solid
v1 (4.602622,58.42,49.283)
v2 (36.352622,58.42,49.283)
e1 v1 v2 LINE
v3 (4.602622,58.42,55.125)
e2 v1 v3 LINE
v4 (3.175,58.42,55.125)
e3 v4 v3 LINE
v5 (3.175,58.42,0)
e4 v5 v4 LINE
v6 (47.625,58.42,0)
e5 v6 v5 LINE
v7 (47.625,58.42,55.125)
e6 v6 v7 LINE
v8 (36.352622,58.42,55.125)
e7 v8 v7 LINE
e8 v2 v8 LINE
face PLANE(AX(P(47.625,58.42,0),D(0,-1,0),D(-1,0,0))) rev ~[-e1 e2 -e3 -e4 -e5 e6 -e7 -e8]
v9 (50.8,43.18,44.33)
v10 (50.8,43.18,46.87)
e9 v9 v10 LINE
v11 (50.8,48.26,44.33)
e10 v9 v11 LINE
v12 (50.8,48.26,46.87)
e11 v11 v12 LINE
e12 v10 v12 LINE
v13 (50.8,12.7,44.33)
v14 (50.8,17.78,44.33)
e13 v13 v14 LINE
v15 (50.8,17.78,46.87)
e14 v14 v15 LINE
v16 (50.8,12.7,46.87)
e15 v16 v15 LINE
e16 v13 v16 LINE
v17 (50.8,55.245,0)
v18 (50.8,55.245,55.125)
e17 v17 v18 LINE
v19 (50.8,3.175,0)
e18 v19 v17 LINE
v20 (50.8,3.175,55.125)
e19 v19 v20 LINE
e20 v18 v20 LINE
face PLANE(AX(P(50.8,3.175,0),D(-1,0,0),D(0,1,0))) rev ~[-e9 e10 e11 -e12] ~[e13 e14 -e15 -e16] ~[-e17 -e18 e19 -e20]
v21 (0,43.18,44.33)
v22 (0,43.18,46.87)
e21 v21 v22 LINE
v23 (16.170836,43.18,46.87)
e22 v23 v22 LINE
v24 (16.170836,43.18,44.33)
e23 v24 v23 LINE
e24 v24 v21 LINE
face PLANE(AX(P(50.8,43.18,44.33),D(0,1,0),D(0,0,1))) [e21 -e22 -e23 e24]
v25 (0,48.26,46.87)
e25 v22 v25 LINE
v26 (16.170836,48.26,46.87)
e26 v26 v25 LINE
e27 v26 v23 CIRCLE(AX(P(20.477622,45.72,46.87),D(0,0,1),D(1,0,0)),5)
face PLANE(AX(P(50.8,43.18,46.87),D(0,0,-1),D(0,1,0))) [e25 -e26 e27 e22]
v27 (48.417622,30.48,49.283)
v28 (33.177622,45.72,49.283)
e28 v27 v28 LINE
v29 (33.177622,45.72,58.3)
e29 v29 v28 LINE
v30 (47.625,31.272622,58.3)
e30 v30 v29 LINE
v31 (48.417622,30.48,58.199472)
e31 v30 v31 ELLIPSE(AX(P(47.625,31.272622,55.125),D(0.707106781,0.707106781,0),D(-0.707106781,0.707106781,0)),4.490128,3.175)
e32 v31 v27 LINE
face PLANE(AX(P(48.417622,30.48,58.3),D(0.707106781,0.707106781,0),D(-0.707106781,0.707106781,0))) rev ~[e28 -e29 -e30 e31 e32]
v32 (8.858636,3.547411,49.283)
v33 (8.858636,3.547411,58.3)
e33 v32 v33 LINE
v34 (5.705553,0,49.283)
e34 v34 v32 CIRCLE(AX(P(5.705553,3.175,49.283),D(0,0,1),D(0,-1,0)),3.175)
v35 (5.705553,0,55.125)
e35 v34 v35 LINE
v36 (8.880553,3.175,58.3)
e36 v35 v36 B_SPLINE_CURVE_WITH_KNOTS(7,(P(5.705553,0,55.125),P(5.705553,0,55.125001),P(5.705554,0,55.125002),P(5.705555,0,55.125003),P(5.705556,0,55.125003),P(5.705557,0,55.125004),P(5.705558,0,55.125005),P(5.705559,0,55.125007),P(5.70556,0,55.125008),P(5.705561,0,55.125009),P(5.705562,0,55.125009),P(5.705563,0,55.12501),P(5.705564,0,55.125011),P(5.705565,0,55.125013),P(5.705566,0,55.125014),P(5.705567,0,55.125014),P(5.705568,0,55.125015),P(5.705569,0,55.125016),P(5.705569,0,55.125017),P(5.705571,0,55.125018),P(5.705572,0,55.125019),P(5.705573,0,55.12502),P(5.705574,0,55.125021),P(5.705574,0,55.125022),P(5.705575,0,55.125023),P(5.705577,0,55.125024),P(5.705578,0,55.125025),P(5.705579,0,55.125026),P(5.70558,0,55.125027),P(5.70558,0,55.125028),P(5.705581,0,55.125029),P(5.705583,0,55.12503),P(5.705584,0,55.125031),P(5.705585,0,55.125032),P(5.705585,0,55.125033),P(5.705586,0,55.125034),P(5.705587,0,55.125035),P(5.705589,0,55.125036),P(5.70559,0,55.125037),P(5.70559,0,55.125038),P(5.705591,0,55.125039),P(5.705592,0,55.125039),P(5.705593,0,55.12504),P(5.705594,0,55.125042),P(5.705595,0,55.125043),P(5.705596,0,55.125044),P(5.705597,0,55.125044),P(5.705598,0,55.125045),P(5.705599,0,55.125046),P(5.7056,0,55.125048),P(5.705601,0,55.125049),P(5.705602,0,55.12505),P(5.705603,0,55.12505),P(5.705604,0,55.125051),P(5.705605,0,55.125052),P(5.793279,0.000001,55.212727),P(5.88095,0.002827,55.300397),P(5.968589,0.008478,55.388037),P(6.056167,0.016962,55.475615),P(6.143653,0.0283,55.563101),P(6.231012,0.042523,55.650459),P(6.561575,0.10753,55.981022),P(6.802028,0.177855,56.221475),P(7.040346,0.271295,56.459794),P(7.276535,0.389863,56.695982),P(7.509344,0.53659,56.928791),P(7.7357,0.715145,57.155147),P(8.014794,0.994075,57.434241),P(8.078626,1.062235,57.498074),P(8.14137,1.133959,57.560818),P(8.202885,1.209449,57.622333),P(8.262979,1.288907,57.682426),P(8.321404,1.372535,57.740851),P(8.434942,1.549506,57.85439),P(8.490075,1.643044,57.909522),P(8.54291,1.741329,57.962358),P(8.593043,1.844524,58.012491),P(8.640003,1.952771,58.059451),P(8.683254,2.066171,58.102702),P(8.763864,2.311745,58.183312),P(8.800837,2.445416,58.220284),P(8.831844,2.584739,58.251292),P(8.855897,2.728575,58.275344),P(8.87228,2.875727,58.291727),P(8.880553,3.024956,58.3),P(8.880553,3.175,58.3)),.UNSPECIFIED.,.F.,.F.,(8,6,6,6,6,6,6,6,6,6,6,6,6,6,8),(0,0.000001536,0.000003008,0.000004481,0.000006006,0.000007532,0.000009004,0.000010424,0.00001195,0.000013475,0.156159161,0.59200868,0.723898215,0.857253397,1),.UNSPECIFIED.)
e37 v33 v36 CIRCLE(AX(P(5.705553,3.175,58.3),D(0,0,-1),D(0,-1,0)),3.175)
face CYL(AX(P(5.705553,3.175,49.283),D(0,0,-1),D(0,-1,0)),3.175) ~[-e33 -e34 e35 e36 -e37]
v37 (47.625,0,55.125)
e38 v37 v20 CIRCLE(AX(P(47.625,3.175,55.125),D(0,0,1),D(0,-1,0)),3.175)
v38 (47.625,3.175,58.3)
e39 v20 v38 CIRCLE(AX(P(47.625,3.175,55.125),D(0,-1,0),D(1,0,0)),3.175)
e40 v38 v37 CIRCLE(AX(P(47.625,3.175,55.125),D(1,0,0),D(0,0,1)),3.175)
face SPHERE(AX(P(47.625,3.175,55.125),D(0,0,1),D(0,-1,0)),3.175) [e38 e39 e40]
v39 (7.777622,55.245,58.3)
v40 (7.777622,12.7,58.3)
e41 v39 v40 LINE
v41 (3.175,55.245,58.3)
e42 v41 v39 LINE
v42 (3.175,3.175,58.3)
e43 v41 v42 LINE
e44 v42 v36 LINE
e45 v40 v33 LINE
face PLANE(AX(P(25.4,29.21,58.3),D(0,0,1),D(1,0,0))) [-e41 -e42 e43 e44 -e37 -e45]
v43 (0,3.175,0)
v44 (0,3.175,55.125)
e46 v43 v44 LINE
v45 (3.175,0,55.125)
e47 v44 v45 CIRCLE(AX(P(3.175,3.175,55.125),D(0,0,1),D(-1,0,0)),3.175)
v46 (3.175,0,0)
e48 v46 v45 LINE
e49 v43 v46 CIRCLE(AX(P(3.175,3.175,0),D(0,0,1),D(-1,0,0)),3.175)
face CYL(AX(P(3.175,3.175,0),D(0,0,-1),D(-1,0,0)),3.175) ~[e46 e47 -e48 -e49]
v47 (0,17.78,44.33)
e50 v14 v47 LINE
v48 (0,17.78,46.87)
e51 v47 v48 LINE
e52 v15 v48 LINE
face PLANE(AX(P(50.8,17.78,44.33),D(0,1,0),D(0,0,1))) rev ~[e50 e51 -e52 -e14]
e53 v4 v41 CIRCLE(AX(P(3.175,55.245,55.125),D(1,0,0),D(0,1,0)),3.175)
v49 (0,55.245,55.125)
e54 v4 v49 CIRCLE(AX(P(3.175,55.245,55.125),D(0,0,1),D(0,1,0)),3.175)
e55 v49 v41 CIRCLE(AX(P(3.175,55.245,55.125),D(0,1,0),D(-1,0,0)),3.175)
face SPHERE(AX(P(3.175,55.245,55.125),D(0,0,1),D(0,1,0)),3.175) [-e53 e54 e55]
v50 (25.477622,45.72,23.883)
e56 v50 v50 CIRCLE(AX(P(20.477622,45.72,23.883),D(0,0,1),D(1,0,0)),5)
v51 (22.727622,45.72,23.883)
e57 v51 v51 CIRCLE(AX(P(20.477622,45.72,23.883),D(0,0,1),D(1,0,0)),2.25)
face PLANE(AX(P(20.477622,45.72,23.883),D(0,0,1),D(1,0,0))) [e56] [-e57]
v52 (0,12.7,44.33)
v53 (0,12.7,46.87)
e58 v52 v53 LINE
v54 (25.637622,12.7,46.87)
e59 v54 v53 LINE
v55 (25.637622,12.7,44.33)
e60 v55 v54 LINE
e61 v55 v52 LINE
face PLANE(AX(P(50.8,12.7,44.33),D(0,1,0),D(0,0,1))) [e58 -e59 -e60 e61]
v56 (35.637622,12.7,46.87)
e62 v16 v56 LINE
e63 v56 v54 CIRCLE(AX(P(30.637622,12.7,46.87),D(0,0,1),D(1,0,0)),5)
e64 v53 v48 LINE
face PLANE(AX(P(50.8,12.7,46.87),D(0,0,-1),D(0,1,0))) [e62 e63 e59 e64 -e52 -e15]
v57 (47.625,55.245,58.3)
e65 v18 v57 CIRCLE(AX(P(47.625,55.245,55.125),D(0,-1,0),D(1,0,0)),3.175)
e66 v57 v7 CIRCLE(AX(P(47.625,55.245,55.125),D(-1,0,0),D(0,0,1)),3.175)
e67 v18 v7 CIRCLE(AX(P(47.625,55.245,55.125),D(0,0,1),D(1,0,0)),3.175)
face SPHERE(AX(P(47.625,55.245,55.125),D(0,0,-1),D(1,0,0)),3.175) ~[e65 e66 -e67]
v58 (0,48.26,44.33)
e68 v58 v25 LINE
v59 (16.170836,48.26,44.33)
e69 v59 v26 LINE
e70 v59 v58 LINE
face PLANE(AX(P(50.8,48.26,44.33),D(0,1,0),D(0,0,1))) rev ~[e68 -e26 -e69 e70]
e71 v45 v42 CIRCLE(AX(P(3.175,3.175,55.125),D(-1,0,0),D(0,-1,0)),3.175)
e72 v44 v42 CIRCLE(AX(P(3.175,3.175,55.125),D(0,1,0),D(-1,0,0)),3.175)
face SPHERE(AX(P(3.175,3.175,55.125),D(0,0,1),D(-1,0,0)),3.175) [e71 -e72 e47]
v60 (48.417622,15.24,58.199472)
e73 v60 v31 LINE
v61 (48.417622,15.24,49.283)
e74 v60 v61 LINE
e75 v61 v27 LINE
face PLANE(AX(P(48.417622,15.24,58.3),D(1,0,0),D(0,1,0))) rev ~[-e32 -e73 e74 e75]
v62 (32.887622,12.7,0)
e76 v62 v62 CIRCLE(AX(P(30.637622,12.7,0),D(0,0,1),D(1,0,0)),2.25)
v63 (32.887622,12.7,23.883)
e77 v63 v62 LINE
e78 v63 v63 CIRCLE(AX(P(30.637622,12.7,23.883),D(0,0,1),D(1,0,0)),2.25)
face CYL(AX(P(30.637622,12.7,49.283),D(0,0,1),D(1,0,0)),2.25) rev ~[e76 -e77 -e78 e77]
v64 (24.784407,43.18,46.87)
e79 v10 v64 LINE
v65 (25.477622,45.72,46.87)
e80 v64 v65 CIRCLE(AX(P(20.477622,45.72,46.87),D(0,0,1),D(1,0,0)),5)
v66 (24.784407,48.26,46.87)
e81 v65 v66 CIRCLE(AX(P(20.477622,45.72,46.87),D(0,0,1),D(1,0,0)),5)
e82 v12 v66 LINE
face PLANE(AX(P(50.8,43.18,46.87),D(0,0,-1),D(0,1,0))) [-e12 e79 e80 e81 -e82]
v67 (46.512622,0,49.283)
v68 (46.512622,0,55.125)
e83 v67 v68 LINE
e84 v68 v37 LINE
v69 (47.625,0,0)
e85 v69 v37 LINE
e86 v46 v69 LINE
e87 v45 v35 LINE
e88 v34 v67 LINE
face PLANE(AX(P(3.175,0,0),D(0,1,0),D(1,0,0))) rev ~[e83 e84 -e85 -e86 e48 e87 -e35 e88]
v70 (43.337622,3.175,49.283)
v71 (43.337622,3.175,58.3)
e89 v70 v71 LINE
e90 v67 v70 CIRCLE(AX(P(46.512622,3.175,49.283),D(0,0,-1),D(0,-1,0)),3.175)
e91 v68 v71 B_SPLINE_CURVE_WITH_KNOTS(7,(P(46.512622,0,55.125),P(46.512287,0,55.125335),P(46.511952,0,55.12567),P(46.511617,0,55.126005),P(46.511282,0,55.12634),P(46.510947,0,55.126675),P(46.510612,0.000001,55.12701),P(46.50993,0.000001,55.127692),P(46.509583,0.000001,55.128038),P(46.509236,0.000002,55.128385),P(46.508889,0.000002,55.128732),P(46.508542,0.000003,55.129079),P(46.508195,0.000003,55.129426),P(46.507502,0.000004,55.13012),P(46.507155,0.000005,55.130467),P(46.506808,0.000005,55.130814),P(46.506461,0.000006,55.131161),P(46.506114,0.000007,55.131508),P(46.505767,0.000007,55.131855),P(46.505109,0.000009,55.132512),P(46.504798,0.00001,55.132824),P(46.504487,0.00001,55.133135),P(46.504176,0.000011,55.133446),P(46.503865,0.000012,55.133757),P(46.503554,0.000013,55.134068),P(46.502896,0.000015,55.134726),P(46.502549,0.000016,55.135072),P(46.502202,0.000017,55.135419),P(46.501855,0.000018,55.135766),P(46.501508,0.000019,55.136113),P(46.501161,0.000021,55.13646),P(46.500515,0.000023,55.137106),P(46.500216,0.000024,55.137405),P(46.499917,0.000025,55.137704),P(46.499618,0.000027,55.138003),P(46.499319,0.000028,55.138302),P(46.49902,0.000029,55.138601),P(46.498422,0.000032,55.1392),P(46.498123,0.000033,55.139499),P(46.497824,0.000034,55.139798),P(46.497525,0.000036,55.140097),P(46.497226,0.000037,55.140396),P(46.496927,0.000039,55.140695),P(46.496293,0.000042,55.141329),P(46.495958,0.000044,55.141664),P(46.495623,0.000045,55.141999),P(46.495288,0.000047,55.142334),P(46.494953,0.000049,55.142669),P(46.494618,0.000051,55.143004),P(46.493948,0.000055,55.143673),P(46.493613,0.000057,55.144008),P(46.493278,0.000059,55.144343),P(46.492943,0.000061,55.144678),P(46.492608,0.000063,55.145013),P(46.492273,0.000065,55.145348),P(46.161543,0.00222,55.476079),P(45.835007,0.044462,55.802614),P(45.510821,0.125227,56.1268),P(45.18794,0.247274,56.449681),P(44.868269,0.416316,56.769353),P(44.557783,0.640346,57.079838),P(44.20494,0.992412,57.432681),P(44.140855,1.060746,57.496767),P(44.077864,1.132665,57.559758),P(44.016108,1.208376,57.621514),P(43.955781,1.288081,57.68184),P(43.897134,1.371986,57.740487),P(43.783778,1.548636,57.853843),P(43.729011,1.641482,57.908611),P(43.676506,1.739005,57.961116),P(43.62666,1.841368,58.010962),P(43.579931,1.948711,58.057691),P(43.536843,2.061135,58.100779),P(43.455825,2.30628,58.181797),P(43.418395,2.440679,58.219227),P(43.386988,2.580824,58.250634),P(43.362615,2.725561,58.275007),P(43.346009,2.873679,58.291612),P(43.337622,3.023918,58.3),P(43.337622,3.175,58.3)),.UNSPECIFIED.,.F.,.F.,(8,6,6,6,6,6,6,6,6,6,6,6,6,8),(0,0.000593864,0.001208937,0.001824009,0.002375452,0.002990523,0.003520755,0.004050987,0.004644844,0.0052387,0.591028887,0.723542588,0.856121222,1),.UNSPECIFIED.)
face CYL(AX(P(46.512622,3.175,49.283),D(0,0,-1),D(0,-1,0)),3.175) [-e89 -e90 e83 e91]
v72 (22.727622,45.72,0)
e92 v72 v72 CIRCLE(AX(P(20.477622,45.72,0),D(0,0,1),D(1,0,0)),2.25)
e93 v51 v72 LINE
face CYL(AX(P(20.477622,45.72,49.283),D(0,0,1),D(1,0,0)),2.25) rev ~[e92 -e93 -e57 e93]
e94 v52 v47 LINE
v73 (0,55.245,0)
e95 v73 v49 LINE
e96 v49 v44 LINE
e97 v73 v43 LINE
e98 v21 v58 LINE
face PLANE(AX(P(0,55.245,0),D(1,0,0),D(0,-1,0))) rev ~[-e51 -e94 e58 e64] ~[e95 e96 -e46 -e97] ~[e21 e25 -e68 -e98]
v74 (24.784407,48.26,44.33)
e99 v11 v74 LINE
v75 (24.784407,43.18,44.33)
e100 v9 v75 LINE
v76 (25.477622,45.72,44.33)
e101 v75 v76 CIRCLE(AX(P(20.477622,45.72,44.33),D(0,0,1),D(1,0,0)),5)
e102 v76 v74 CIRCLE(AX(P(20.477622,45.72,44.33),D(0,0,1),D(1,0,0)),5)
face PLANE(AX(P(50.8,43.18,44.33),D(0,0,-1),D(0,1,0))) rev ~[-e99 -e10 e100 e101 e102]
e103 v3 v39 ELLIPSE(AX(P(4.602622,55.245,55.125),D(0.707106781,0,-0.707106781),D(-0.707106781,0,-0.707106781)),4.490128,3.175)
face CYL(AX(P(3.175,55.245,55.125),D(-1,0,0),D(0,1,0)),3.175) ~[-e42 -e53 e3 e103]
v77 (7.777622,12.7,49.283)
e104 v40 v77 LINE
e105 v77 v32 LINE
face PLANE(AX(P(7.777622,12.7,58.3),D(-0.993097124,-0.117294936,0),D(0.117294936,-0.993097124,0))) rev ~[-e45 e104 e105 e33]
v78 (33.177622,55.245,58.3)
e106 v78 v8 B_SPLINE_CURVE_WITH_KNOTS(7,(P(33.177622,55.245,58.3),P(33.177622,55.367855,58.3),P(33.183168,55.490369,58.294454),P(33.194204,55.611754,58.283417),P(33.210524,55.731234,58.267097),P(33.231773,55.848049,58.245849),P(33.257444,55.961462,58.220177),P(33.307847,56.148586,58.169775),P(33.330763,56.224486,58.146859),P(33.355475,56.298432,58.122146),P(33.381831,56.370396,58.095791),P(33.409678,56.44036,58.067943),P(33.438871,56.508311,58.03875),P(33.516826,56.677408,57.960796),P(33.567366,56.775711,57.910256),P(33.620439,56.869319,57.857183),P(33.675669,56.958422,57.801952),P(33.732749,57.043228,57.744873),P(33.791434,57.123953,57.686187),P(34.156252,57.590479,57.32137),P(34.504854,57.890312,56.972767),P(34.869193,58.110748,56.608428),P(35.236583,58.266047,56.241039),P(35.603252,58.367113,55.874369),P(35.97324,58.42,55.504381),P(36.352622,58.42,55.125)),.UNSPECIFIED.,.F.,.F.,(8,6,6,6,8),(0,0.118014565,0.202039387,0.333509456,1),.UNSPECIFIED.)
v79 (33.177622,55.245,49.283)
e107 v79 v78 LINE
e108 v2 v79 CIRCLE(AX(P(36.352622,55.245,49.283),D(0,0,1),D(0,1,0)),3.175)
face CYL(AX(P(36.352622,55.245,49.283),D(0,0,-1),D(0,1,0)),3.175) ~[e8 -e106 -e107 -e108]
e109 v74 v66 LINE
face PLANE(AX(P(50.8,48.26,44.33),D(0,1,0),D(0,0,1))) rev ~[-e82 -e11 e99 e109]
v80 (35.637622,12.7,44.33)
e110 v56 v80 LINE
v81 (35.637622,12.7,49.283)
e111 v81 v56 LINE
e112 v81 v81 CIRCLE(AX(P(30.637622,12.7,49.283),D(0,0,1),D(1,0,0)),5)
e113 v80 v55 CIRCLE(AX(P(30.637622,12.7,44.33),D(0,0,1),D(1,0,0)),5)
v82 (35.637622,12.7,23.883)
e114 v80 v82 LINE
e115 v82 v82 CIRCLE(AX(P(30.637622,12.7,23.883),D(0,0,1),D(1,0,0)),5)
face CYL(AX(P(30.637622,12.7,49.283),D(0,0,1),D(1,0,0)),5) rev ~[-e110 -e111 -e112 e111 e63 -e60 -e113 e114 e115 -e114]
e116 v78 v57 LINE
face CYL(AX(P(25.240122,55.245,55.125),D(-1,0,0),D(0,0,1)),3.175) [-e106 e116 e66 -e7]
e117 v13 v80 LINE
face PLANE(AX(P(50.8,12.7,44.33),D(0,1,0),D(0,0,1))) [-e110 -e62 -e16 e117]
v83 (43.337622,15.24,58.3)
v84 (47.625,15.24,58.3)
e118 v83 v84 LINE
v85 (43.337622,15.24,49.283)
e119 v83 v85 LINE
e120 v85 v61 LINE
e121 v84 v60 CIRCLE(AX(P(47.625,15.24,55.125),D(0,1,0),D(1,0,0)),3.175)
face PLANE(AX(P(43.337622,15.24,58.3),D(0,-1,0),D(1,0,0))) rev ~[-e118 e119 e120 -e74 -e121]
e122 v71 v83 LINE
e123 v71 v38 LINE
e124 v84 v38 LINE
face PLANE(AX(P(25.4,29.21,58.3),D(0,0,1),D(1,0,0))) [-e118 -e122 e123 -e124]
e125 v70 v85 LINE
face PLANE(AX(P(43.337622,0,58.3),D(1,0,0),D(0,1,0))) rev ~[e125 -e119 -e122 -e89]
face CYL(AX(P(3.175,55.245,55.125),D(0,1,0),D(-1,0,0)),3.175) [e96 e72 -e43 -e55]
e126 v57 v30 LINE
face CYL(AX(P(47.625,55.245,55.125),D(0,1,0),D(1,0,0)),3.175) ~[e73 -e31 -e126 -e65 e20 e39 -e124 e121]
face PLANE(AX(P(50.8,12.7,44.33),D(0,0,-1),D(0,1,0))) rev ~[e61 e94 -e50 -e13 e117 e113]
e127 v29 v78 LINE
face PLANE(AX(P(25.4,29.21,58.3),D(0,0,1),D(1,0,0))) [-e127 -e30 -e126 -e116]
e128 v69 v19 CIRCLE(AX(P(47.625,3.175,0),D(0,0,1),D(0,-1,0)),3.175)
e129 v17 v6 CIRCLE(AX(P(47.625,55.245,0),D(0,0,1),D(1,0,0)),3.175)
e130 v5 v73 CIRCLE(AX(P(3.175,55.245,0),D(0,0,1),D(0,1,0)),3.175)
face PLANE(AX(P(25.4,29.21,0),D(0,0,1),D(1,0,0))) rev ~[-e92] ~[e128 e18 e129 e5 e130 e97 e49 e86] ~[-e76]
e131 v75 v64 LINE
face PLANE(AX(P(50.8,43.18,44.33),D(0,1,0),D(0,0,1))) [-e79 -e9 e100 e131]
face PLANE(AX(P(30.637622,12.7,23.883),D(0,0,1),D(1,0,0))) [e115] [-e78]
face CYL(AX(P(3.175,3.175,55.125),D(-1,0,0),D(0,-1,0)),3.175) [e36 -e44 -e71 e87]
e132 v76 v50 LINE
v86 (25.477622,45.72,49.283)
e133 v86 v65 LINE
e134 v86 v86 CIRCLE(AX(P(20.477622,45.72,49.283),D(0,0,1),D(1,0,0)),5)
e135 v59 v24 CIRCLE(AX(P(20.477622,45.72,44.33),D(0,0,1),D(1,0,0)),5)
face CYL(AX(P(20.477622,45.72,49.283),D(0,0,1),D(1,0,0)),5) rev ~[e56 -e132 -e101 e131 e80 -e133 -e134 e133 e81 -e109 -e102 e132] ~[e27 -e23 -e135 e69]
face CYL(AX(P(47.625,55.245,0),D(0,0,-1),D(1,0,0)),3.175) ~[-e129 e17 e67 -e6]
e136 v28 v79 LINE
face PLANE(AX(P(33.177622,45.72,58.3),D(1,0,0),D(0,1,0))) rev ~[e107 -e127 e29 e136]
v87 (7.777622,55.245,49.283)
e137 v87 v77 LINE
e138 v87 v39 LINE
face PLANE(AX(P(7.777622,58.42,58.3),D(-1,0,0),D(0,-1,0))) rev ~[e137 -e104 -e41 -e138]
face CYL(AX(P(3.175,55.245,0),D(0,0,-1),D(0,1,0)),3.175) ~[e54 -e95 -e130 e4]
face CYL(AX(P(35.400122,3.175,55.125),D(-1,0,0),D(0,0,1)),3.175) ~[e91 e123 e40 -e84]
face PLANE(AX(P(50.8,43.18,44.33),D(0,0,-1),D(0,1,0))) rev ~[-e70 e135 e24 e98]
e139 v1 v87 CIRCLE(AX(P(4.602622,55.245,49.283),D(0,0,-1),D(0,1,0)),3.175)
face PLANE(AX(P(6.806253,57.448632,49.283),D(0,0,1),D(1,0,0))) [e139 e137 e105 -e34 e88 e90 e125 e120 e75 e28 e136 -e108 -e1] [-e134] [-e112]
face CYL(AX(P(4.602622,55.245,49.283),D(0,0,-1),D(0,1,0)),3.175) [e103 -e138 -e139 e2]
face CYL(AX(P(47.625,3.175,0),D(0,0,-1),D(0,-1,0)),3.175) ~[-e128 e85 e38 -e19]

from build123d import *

# Parameters (mm, degrees)
F1_DEPTH     = 58.3
F3_DEPTH     = 9.017
F4_W         = 5.08
F4_H         = 2.54
F5_DEPTH     = 50.801
F6_T1_DEPTH  = 17.9471724254
F6_T3_DEPTH  = 16.9545
F6_T5_DEPTH  = 52.07
F6_T7_DEPTH  = 22.3848784961
F6_T9_DEPTH  = 12.2248784961
F6_T11_DEPTH = 14.0401215039
F6_T13_DEPTH = 12.5401215039
F6_T16_ANGLE = 90
F6_T18_ANGLE = 90
F6_T20_ANGLE = 90
F6_T22_ANGLE = 90
F7_R         = 5
F8_DEPTH     = 25.4
F9_R         = 2.25
F10_DEPTH    = 49.284


# Not quite as in the source:
# - a fillet or chamfer that OpenCascade refuses, or shapes differently, is made with other operations: its cross-section is extruded or revolved along the edge and cut away or added


with BuildPart() as f1:
    # F0 (on Top) → F1 (new body)
    with BuildSketch(Plane.XY):
        with BuildLine():
            Line((47.625, 58.42), (3.175, 58.42))
            ThreePointArc((3.175, 58.42), (0.9299359697, 57.4900640303), (0, 55.245))
            Line((0, 55.245), (0, 3.175))
            ThreePointArc((0, 3.175), (0.9299359697, 0.9299359697), (3.175, 0))
            Line((3.175, 0), (47.625, 0))
            ThreePointArc((47.625, 0), (49.8700640303, 0.9299359697), (50.8, 3.175))
            Line((50.8, 3.175), (50.8, 55.245))
            ThreePointArc((50.8, 55.245), (49.8700640303, 57.4900640303), (47.625, 58.42))
        make_face()
    extrude(amount=F1_DEPTH)

    # F2 (on face) → F3 (cut)
    with BuildSketch(Plane.XY.offset(58.3)):
        Polygon((33.1776215039, 45.72), (33.1776215039, 58.42), (7.7776215039, 58.42), (7.7776215039, 12.7), (9.2776215039, 0), (43.3376215039, 0), (43.3376215039, 15.24), (48.4176215039, 15.24), (48.4176215039, 30.48), align=None)
    extrude(amount=-F3_DEPTH, mode=Mode.SUBTRACT)

    # F4 (on face) → F5 (cut, through all)
    with BuildSketch(Plane.YZ.offset(50.8)):
        with Locations((15.24, 45.6)):
            Rectangle(F4_W, F4_H)
        with Locations((45.72, 45.6)):
            Rectangle(F4_W, F4_H)
    extrude(amount=-F5_DEPTH, mode=Mode.SUBTRACT)

    # F6: fillet of radius 3.175 on 6 edges, made by hand

    # F6_s2 → F6_t1 (cut)
    with BuildSketch(Plane.XY.offset(49.283)):
        with BuildLine():
            ThreePointArc((5.7055525338, 0), (8.0786339971, 1.0657087996), (8.8586359029, 3.5474114216))
            Line((8.8586359029, 3.5474114216), (9.2776215039, 0))
            Line((9.2776215039, 0), (5.7055525338, 0))
        make_face()
    extrude(amount=F6_T1_DEPTH, mode=Mode.SUBTRACT)

    # F6_s4 → F6_t3 (cut)
    with BuildSketch(Plane.XY.offset(49.283)):
        with BuildLine():
            ThreePointArc((46.5126215039, 0), (44.2675574737, 0.9299359697), (43.3376215039, 3.175))
            Line((43.3376215039, 3.175), (43.3376215039, 0))
            Line((43.3376215039, 0), (46.5126215039, 0))
        make_face()
        with BuildLine():
            ThreePointArc((4.6026215039, 58.42), (6.8476855342, 57.4900640303), (7.7776215039, 55.245))
            Line((7.7776215039, 55.245), (7.7776215039, 58.42))
            Line((7.7776215039, 58.42), (4.6026215039, 58.42))
        make_face()
        with BuildLine():
            ThreePointArc((36.3526215039, 58.42), (34.1075574737, 57.4900640303), (33.1776215039, 55.245))
            Line((33.1776215039, 55.245), (33.1776215039, 58.42))
            Line((33.1776215039, 58.42), (36.3526215039, 58.42))
        make_face()
    extrude(amount=F6_T3_DEPTH, mode=Mode.SUBTRACT)

    # F6_s6 → F6_t5 (cut)
    with BuildSketch(Plane.XZ.offset(-55.245)):
        with BuildLine():
            ThreePointArc((0, 55.125), (0.9299359697, 57.3700640303), (3.175, 58.3))
            Line((3.175, 58.3), (0, 58.3))
            Line((0, 58.3), (0, 55.125))
        make_face()
        with BuildLine():
            ThreePointArc((50.8, 55.125), (49.8700640303, 57.3700640303), (47.625, 58.3))
            Line((47.625, 58.3), (50.8, 58.3))
            Line((50.8, 58.3), (50.8, 55.125))
        make_face()
    extrude(amount=F6_T5_DEPTH, mode=Mode.SUBTRACT)

    # F6_s8 → F6_t7 (cut)
    with BuildSketch(Plane.YZ.offset(25.2401215039)):
        with BuildLine():
            ThreePointArc((55.245, 58.3), (57.4900640303, 57.3700640303), (58.42, 55.125))
            Line((58.42, 55.125), (58.42, 58.3))
            Line((58.42, 58.3), (55.245, 58.3))
        make_face()
    extrude(amount=F6_T7_DEPTH, mode=Mode.SUBTRACT)

    # F6_s10 → F6_t9 (cut)
    with BuildSketch(Plane.YZ.offset(35.4001215039)):
        with BuildLine():
            ThreePointArc((3.175, 58.3), (0.9299359697, 57.3700640303), (0, 55.125))
            Line((0, 55.125), (0, 58.3))
            Line((0, 58.3), (3.175, 58.3))
        make_face()
    extrude(amount=F6_T9_DEPTH, mode=Mode.SUBTRACT)

    # F6_s12 → F6_t11 (cut)
    with BuildSketch(Plane.YZ.offset(3.175)):
        with BuildLine():
            ThreePointArc((0, 55.125), (0.9299359697, 57.3700640303), (3.175, 58.3))
            Line((3.175, 58.3), (0, 58.3))
            Line((0, 58.3), (0, 55.125))
        make_face()
    extrude(amount=F6_T11_DEPTH, mode=Mode.SUBTRACT)

    # F6_s14 → F6_t13 (cut)
    with BuildSketch(Plane.YZ.offset(3.175)):
        with BuildLine():
            ThreePointArc((58.42, 55.125), (57.4900640303, 57.3700640303), (55.245, 58.3))
            Line((55.245, 58.3), (58.42, 58.3))
            Line((58.42, 58.3), (58.42, 55.125))
        make_face()
    extrude(amount=F6_T13_DEPTH, mode=Mode.SUBTRACT)

    # F6_s15 → F6_t16 (revolve, cut)
    with BuildSketch(Plane.YZ.offset(47.625)):
        with BuildLine():
            ThreePointArc((0, 55.125), (0.9299359697, 57.3700640303), (3.175, 58.3))
            Line((3.175, 58.3), (0, 58.3))
            Line((0, 58.3), (0, 55.125))
        make_face()
    revolve(axis=Axis((47.625, 3.175, 58.3), (0, 0, 1)), revolution_arc=F6_T16_ANGLE, mode=Mode.SUBTRACT)

    # F6_s17 → F6_t18 (revolve, cut)
    with BuildSketch(Plane.XZ.offset(-55.245)):
        with BuildLine():
            ThreePointArc((47.625, 58.3), (49.8700640303, 57.3700640303), (50.8, 55.125))
            Line((50.8, 55.125), (50.8, 58.3))
            Line((50.8, 58.3), (47.625, 58.3))
        make_face()
    revolve(axis=Axis((47.625, 55.245, 58.3), (0, 0, 1)), revolution_arc=F6_T18_ANGLE, mode=Mode.SUBTRACT)

    # F6_s19 → F6_t20 (revolve, cut)
    with BuildSketch(Plane.YZ.offset(3.175)):
        with BuildLine():
            ThreePointArc((58.42, 55.125), (57.4900640303, 57.3700640303), (55.245, 58.3))
            Line((55.245, 58.3), (58.42, 58.3))
            Line((58.42, 58.3), (58.42, 55.125))
        make_face()
    revolve(axis=Axis((3.175, 55.245, 58.3), (0, 0, 1)), revolution_arc=F6_T20_ANGLE, mode=Mode.SUBTRACT)

    # F6_s21 → F6_t22 (revolve, cut)
    with BuildSketch(Plane.XZ.offset(-3.175)):
        with BuildLine():
            ThreePointArc((0, 55.125), (0.9299359697, 57.3700640303), (3.175, 58.3))
            Line((3.175, 58.3), (0, 58.3))
            Line((0, 58.3), (0, 55.125))
        make_face()
    revolve(axis=Axis((3.175, 3.175, 58.3), (0, 0, 1)), revolution_arc=F6_T22_ANGLE, mode=Mode.SUBTRACT)

    # F7 (on face) → F8 (cut)
    with BuildSketch(Plane.XY.offset(49.283)):
        with Locations((20.4776215039, 45.72)):
            Circle(F7_R)
        with Locations((30.6376215039, 12.7)):
            Circle(F7_R)
    extrude(amount=-F8_DEPTH, mode=Mode.SUBTRACT)

    # F9 (on face) → F10 (cut, through all)
    with BuildSketch(Plane.XY.offset(49.283)):
        with Locations((20.4776215039, 45.72)):
            Circle(F9_R)
        with Locations((30.6376215039, 12.7)):
            Circle(F9_R)
    extrude(amount=-F10_DEPTH, mode=Mode.SUBTRACT)


solid = f1.part
